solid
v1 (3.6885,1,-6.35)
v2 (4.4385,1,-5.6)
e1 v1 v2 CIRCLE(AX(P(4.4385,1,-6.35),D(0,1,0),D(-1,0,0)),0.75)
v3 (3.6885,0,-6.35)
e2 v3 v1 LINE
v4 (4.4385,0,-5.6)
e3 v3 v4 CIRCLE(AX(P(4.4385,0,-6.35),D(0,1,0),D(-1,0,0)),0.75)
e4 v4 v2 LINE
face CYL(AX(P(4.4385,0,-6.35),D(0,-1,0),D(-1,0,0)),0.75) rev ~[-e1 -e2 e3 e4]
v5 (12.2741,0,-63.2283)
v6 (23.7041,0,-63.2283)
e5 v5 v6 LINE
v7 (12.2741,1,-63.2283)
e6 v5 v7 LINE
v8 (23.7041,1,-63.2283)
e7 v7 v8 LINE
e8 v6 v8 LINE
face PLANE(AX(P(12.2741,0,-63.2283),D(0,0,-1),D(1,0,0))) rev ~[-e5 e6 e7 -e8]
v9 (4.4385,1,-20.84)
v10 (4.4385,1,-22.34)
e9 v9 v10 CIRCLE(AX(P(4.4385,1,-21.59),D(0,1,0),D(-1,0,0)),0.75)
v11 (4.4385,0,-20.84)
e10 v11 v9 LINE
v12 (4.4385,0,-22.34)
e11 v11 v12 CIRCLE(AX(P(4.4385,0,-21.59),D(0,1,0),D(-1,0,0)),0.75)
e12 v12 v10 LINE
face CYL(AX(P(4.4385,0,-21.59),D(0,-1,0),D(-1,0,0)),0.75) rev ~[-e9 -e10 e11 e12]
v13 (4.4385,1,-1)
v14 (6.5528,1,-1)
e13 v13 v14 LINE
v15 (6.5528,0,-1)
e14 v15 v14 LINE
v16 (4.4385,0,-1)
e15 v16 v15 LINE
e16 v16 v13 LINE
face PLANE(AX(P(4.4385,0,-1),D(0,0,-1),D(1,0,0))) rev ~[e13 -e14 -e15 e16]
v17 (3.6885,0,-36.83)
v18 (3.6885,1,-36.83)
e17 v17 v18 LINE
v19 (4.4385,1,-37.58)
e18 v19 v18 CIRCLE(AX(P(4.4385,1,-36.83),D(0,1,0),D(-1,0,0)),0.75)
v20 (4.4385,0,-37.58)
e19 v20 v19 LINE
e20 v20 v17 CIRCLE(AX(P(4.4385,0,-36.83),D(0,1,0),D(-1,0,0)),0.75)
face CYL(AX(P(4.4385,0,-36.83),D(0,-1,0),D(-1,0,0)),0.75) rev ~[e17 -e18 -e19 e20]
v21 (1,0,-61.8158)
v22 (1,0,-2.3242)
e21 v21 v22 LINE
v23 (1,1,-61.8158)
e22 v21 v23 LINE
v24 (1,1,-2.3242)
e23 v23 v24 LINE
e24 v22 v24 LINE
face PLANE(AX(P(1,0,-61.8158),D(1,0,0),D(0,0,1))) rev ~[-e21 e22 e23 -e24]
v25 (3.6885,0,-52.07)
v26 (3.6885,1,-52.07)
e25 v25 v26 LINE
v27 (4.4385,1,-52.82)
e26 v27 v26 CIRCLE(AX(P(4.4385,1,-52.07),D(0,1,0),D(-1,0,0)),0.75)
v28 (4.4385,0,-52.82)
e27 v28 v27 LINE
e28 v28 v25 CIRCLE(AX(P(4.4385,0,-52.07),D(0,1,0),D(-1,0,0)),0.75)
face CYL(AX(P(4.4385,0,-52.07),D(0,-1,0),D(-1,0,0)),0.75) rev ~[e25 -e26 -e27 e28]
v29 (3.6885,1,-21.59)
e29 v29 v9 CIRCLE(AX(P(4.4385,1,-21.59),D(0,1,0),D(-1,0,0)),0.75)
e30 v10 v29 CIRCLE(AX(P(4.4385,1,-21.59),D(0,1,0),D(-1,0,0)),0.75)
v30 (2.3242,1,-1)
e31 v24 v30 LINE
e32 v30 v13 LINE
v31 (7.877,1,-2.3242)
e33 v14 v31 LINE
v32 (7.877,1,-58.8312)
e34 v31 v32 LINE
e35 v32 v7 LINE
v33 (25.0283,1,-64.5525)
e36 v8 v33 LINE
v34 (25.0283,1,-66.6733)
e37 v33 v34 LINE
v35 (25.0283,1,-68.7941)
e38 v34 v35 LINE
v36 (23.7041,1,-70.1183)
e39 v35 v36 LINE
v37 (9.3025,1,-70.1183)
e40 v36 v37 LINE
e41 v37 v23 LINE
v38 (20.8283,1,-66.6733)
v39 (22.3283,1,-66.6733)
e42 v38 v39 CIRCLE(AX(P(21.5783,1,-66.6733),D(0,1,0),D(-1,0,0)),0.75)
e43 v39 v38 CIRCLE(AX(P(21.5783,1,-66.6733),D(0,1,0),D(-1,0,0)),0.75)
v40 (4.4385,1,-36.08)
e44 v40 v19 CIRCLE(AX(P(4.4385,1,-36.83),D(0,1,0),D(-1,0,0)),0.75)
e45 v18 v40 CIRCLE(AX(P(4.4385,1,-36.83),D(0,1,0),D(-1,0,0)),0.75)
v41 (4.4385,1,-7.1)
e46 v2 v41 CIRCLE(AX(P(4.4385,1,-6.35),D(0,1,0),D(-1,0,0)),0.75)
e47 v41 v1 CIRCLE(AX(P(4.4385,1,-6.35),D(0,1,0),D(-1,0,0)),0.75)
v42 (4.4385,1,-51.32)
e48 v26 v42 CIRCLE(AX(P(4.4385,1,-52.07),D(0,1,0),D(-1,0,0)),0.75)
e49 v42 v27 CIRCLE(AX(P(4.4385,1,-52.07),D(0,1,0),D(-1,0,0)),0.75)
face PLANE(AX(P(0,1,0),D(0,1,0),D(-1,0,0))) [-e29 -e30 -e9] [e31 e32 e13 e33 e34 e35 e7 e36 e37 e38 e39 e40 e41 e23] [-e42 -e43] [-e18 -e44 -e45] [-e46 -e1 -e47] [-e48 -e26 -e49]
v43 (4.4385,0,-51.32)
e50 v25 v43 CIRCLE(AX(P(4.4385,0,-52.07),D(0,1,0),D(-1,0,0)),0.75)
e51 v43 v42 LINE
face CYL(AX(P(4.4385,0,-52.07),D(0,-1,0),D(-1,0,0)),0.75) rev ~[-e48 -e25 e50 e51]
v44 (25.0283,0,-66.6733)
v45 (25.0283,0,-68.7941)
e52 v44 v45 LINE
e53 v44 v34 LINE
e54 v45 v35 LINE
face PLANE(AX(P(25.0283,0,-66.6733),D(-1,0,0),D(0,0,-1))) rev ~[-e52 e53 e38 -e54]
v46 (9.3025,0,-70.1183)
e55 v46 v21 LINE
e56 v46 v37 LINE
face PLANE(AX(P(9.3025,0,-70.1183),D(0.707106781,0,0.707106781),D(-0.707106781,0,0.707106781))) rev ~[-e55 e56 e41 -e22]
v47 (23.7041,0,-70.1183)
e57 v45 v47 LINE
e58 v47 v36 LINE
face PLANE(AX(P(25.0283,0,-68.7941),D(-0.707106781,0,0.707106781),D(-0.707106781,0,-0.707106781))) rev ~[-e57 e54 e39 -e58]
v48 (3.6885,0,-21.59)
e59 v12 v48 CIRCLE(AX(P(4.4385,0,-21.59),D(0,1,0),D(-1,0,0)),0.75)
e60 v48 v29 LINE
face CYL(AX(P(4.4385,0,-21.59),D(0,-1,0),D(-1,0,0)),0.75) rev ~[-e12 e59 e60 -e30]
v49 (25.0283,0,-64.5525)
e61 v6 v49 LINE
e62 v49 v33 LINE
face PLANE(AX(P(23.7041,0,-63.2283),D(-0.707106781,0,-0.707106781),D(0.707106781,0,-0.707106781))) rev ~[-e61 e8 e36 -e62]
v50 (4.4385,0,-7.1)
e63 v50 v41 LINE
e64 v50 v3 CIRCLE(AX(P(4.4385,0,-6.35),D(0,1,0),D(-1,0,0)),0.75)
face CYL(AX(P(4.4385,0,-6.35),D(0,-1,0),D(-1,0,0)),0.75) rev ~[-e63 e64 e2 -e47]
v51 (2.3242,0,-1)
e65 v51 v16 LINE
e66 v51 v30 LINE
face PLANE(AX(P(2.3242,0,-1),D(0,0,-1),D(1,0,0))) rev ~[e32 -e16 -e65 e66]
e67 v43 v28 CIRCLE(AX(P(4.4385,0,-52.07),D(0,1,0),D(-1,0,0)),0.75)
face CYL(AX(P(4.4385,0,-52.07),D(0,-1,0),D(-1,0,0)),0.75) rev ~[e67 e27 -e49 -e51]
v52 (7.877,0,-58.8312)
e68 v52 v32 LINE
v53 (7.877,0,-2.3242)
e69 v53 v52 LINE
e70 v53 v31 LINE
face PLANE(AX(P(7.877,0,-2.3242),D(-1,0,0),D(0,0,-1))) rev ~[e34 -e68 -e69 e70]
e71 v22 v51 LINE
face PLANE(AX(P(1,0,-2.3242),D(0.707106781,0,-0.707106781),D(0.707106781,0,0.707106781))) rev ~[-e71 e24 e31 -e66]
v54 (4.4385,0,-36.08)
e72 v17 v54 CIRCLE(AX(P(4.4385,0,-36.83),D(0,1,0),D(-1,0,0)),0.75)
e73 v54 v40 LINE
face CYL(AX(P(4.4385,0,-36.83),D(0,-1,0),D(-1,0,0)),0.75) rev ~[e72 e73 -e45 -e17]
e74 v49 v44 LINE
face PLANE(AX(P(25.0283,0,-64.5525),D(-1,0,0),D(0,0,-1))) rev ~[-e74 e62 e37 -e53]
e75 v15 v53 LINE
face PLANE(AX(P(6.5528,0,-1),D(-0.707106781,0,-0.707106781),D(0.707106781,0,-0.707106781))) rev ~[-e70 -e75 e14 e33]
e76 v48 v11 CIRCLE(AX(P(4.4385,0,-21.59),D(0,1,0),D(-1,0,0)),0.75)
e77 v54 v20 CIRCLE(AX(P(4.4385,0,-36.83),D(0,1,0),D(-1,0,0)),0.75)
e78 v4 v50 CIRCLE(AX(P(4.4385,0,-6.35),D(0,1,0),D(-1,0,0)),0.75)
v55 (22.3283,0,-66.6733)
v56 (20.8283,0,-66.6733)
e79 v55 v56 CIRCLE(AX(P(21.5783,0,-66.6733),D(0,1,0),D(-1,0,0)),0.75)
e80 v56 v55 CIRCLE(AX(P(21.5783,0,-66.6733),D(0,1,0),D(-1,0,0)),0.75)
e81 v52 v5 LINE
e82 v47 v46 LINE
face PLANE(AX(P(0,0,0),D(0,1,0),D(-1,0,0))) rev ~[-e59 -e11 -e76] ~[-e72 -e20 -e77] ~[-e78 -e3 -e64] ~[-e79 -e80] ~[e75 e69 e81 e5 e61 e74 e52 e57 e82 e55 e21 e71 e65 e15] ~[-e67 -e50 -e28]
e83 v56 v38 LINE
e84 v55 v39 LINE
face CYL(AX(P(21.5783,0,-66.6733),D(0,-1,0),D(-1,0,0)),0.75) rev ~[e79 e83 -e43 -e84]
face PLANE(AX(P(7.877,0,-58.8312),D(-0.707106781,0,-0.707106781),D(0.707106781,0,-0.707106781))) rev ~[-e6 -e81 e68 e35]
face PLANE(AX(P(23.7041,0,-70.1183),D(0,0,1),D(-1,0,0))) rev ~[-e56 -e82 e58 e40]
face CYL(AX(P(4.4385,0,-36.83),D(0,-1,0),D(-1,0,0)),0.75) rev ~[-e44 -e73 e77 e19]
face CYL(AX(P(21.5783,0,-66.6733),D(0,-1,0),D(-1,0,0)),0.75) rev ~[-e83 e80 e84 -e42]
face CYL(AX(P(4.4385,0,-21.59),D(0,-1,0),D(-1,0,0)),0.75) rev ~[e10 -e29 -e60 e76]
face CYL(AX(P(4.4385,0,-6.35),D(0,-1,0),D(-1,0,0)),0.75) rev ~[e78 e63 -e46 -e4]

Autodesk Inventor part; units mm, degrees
ref_plane "YZ Plane" through (0, 0, 0) normal (1, 0, 0) x (0, 1, 0)
ref_plane "XZ Plane" through (0, 0, 0) normal (0, 1, 0) x (-1, 0, 0)
ref_plane "XY Plane" through (0, 0, 0) normal (0, 0, 1) x (1, 0, 0)
sketch "Szkic1" plane through (0, 0, 0) normal (0, 1, 0) x (-1, 0, 0)
  line L0 (0, -1.91) -> (0, -62.23)
  line L1 (0, -62.23) -> (-8.8883, -71.1183)
  line L2 (0, -62.23) -> (12.57, -62.23) construction
  line L3 (-8.8883, -71.1183) -> (-24.1183, -71.1183)
  line L4 (-26.0283, -69.2083) -> (-26.0283, -64.1383)
  line L5 (-24.1183, -62.2283) -> (-12.6883, -62.2283)
  line L6 (-12.6883, -62.2283) -> (-8.877, -58.417)
  line L7 (-12.6883, -62.2283) -> (-7.2983, -62.2283) construction
  line L8 (-8.877, -58.417) -> (-8.877, -1.91)
  line L9 (-6.967, 0) -> (-1.91, 0)
  line L10 (-1.91, 0) -> (0, -1.91)
  line L11 (-8.877, -1.91) -> (-6.967, 0)
  line L12 (-26.0283, -64.1383) -> (-24.1183, -62.2283)
  line L13 (-26.0283, -69.2083) -> (-24.1183, -71.1183)
  line L14 (-26.0283, -66.6733) -> (-15.6934, -66.6733)
  circle A0 centre (-21.5783, -66.6733) radius 0.75
  line L15 (-4.4385, 0) -> (-4.4385, -63.1833)
  circle A1 centre (-4.4385, -6.35) radius 0.75
  circle A2 centre (-4.4385, -21.59) radius 0.75
  circle A3 centre (-4.4385, -36.83) radius 0.75
  circle A4 centre (-4.4385, -52.07) radius 0.75
  line L16 (-1, -61.8158) -> (-1, -2.3242)
  line L17 (-1, -2.3242) -> (-2.3242, -1)
  line L18 (-2.3242, -1) -> (-6.5528, -1)
  line L19 (-6.5528, -1) -> (-7.877, -2.3242)
  line L20 (-7.877, -2.3242) -> (-7.877, -58.8312)
  line L21 (-7.877, -58.8312) -> (-12.2741, -63.2283)
  line L22 (-12.2741, -63.2283) -> (-23.7041, -63.2283)
  line L23 (-23.7041, -63.2283) -> (-25.0283, -64.5525)
  line L24 (-25.0283, -64.5525) -> (-25.0283, -68.7941)
  line L25 (-25.0283, -68.7941) -> (-23.7041, -70.1183)
  line L26 (-23.7041, -70.1183) -> (-9.3025, -70.1183)
  line L27 (-9.3025, -70.1183) -> (-1, -61.8158)
  point P0 (0, 0)
  point P1 (-26.0283, -71.1183)
  point P2 (-26.0283, -62.2283)
  point P3 (-8.877, 0)
  dimension "d0" = 62.23
  dimension "d1" = 135
  dimension "d2" = 12.57
  dimension "d3" = 17.14
  dimension "d4" = 8.89
  dimension "d5" = 13.34
  dimension "d6" = 45
  dimension "d7" = 5.39
  dimension "d8" = 1.91
  dimension "d9" = 1.91
  dimension "d10" = 1.91
  dimension "d11" = 1.91
  dimension "d12" = 1.91
  dimension "d13" = 1.91
  dimension "d14" = 1.91
  dimension "d15" = 1.91
  dimension "d16" = 1.5
  dimension "d17" = 4.45
  dimension "d18" = 1.5
  dimension "d19" = 6.35
  dimension "d22" = 15.24
  dimension "d27" = 19.048
  dimension "d28" = 1
  dimension "d31" = 45.72
extrude "Wyciągnięcie proste1" add sketch "Szkic1" along normal blind 1 contours L18 L17 L16 L27 L26 L25 L24 L23 L22 L21 L20 L19
equation "\"d9\" = d8"
equation "\"d10\" = d8"
equation "\"d11\" = d10"
equation "\"d12\" = d8"
equation "\"d13\" = d12"
equation "\"d14\" = d8"
equation "\"d15\" = d14"
properties part number "gnd"
